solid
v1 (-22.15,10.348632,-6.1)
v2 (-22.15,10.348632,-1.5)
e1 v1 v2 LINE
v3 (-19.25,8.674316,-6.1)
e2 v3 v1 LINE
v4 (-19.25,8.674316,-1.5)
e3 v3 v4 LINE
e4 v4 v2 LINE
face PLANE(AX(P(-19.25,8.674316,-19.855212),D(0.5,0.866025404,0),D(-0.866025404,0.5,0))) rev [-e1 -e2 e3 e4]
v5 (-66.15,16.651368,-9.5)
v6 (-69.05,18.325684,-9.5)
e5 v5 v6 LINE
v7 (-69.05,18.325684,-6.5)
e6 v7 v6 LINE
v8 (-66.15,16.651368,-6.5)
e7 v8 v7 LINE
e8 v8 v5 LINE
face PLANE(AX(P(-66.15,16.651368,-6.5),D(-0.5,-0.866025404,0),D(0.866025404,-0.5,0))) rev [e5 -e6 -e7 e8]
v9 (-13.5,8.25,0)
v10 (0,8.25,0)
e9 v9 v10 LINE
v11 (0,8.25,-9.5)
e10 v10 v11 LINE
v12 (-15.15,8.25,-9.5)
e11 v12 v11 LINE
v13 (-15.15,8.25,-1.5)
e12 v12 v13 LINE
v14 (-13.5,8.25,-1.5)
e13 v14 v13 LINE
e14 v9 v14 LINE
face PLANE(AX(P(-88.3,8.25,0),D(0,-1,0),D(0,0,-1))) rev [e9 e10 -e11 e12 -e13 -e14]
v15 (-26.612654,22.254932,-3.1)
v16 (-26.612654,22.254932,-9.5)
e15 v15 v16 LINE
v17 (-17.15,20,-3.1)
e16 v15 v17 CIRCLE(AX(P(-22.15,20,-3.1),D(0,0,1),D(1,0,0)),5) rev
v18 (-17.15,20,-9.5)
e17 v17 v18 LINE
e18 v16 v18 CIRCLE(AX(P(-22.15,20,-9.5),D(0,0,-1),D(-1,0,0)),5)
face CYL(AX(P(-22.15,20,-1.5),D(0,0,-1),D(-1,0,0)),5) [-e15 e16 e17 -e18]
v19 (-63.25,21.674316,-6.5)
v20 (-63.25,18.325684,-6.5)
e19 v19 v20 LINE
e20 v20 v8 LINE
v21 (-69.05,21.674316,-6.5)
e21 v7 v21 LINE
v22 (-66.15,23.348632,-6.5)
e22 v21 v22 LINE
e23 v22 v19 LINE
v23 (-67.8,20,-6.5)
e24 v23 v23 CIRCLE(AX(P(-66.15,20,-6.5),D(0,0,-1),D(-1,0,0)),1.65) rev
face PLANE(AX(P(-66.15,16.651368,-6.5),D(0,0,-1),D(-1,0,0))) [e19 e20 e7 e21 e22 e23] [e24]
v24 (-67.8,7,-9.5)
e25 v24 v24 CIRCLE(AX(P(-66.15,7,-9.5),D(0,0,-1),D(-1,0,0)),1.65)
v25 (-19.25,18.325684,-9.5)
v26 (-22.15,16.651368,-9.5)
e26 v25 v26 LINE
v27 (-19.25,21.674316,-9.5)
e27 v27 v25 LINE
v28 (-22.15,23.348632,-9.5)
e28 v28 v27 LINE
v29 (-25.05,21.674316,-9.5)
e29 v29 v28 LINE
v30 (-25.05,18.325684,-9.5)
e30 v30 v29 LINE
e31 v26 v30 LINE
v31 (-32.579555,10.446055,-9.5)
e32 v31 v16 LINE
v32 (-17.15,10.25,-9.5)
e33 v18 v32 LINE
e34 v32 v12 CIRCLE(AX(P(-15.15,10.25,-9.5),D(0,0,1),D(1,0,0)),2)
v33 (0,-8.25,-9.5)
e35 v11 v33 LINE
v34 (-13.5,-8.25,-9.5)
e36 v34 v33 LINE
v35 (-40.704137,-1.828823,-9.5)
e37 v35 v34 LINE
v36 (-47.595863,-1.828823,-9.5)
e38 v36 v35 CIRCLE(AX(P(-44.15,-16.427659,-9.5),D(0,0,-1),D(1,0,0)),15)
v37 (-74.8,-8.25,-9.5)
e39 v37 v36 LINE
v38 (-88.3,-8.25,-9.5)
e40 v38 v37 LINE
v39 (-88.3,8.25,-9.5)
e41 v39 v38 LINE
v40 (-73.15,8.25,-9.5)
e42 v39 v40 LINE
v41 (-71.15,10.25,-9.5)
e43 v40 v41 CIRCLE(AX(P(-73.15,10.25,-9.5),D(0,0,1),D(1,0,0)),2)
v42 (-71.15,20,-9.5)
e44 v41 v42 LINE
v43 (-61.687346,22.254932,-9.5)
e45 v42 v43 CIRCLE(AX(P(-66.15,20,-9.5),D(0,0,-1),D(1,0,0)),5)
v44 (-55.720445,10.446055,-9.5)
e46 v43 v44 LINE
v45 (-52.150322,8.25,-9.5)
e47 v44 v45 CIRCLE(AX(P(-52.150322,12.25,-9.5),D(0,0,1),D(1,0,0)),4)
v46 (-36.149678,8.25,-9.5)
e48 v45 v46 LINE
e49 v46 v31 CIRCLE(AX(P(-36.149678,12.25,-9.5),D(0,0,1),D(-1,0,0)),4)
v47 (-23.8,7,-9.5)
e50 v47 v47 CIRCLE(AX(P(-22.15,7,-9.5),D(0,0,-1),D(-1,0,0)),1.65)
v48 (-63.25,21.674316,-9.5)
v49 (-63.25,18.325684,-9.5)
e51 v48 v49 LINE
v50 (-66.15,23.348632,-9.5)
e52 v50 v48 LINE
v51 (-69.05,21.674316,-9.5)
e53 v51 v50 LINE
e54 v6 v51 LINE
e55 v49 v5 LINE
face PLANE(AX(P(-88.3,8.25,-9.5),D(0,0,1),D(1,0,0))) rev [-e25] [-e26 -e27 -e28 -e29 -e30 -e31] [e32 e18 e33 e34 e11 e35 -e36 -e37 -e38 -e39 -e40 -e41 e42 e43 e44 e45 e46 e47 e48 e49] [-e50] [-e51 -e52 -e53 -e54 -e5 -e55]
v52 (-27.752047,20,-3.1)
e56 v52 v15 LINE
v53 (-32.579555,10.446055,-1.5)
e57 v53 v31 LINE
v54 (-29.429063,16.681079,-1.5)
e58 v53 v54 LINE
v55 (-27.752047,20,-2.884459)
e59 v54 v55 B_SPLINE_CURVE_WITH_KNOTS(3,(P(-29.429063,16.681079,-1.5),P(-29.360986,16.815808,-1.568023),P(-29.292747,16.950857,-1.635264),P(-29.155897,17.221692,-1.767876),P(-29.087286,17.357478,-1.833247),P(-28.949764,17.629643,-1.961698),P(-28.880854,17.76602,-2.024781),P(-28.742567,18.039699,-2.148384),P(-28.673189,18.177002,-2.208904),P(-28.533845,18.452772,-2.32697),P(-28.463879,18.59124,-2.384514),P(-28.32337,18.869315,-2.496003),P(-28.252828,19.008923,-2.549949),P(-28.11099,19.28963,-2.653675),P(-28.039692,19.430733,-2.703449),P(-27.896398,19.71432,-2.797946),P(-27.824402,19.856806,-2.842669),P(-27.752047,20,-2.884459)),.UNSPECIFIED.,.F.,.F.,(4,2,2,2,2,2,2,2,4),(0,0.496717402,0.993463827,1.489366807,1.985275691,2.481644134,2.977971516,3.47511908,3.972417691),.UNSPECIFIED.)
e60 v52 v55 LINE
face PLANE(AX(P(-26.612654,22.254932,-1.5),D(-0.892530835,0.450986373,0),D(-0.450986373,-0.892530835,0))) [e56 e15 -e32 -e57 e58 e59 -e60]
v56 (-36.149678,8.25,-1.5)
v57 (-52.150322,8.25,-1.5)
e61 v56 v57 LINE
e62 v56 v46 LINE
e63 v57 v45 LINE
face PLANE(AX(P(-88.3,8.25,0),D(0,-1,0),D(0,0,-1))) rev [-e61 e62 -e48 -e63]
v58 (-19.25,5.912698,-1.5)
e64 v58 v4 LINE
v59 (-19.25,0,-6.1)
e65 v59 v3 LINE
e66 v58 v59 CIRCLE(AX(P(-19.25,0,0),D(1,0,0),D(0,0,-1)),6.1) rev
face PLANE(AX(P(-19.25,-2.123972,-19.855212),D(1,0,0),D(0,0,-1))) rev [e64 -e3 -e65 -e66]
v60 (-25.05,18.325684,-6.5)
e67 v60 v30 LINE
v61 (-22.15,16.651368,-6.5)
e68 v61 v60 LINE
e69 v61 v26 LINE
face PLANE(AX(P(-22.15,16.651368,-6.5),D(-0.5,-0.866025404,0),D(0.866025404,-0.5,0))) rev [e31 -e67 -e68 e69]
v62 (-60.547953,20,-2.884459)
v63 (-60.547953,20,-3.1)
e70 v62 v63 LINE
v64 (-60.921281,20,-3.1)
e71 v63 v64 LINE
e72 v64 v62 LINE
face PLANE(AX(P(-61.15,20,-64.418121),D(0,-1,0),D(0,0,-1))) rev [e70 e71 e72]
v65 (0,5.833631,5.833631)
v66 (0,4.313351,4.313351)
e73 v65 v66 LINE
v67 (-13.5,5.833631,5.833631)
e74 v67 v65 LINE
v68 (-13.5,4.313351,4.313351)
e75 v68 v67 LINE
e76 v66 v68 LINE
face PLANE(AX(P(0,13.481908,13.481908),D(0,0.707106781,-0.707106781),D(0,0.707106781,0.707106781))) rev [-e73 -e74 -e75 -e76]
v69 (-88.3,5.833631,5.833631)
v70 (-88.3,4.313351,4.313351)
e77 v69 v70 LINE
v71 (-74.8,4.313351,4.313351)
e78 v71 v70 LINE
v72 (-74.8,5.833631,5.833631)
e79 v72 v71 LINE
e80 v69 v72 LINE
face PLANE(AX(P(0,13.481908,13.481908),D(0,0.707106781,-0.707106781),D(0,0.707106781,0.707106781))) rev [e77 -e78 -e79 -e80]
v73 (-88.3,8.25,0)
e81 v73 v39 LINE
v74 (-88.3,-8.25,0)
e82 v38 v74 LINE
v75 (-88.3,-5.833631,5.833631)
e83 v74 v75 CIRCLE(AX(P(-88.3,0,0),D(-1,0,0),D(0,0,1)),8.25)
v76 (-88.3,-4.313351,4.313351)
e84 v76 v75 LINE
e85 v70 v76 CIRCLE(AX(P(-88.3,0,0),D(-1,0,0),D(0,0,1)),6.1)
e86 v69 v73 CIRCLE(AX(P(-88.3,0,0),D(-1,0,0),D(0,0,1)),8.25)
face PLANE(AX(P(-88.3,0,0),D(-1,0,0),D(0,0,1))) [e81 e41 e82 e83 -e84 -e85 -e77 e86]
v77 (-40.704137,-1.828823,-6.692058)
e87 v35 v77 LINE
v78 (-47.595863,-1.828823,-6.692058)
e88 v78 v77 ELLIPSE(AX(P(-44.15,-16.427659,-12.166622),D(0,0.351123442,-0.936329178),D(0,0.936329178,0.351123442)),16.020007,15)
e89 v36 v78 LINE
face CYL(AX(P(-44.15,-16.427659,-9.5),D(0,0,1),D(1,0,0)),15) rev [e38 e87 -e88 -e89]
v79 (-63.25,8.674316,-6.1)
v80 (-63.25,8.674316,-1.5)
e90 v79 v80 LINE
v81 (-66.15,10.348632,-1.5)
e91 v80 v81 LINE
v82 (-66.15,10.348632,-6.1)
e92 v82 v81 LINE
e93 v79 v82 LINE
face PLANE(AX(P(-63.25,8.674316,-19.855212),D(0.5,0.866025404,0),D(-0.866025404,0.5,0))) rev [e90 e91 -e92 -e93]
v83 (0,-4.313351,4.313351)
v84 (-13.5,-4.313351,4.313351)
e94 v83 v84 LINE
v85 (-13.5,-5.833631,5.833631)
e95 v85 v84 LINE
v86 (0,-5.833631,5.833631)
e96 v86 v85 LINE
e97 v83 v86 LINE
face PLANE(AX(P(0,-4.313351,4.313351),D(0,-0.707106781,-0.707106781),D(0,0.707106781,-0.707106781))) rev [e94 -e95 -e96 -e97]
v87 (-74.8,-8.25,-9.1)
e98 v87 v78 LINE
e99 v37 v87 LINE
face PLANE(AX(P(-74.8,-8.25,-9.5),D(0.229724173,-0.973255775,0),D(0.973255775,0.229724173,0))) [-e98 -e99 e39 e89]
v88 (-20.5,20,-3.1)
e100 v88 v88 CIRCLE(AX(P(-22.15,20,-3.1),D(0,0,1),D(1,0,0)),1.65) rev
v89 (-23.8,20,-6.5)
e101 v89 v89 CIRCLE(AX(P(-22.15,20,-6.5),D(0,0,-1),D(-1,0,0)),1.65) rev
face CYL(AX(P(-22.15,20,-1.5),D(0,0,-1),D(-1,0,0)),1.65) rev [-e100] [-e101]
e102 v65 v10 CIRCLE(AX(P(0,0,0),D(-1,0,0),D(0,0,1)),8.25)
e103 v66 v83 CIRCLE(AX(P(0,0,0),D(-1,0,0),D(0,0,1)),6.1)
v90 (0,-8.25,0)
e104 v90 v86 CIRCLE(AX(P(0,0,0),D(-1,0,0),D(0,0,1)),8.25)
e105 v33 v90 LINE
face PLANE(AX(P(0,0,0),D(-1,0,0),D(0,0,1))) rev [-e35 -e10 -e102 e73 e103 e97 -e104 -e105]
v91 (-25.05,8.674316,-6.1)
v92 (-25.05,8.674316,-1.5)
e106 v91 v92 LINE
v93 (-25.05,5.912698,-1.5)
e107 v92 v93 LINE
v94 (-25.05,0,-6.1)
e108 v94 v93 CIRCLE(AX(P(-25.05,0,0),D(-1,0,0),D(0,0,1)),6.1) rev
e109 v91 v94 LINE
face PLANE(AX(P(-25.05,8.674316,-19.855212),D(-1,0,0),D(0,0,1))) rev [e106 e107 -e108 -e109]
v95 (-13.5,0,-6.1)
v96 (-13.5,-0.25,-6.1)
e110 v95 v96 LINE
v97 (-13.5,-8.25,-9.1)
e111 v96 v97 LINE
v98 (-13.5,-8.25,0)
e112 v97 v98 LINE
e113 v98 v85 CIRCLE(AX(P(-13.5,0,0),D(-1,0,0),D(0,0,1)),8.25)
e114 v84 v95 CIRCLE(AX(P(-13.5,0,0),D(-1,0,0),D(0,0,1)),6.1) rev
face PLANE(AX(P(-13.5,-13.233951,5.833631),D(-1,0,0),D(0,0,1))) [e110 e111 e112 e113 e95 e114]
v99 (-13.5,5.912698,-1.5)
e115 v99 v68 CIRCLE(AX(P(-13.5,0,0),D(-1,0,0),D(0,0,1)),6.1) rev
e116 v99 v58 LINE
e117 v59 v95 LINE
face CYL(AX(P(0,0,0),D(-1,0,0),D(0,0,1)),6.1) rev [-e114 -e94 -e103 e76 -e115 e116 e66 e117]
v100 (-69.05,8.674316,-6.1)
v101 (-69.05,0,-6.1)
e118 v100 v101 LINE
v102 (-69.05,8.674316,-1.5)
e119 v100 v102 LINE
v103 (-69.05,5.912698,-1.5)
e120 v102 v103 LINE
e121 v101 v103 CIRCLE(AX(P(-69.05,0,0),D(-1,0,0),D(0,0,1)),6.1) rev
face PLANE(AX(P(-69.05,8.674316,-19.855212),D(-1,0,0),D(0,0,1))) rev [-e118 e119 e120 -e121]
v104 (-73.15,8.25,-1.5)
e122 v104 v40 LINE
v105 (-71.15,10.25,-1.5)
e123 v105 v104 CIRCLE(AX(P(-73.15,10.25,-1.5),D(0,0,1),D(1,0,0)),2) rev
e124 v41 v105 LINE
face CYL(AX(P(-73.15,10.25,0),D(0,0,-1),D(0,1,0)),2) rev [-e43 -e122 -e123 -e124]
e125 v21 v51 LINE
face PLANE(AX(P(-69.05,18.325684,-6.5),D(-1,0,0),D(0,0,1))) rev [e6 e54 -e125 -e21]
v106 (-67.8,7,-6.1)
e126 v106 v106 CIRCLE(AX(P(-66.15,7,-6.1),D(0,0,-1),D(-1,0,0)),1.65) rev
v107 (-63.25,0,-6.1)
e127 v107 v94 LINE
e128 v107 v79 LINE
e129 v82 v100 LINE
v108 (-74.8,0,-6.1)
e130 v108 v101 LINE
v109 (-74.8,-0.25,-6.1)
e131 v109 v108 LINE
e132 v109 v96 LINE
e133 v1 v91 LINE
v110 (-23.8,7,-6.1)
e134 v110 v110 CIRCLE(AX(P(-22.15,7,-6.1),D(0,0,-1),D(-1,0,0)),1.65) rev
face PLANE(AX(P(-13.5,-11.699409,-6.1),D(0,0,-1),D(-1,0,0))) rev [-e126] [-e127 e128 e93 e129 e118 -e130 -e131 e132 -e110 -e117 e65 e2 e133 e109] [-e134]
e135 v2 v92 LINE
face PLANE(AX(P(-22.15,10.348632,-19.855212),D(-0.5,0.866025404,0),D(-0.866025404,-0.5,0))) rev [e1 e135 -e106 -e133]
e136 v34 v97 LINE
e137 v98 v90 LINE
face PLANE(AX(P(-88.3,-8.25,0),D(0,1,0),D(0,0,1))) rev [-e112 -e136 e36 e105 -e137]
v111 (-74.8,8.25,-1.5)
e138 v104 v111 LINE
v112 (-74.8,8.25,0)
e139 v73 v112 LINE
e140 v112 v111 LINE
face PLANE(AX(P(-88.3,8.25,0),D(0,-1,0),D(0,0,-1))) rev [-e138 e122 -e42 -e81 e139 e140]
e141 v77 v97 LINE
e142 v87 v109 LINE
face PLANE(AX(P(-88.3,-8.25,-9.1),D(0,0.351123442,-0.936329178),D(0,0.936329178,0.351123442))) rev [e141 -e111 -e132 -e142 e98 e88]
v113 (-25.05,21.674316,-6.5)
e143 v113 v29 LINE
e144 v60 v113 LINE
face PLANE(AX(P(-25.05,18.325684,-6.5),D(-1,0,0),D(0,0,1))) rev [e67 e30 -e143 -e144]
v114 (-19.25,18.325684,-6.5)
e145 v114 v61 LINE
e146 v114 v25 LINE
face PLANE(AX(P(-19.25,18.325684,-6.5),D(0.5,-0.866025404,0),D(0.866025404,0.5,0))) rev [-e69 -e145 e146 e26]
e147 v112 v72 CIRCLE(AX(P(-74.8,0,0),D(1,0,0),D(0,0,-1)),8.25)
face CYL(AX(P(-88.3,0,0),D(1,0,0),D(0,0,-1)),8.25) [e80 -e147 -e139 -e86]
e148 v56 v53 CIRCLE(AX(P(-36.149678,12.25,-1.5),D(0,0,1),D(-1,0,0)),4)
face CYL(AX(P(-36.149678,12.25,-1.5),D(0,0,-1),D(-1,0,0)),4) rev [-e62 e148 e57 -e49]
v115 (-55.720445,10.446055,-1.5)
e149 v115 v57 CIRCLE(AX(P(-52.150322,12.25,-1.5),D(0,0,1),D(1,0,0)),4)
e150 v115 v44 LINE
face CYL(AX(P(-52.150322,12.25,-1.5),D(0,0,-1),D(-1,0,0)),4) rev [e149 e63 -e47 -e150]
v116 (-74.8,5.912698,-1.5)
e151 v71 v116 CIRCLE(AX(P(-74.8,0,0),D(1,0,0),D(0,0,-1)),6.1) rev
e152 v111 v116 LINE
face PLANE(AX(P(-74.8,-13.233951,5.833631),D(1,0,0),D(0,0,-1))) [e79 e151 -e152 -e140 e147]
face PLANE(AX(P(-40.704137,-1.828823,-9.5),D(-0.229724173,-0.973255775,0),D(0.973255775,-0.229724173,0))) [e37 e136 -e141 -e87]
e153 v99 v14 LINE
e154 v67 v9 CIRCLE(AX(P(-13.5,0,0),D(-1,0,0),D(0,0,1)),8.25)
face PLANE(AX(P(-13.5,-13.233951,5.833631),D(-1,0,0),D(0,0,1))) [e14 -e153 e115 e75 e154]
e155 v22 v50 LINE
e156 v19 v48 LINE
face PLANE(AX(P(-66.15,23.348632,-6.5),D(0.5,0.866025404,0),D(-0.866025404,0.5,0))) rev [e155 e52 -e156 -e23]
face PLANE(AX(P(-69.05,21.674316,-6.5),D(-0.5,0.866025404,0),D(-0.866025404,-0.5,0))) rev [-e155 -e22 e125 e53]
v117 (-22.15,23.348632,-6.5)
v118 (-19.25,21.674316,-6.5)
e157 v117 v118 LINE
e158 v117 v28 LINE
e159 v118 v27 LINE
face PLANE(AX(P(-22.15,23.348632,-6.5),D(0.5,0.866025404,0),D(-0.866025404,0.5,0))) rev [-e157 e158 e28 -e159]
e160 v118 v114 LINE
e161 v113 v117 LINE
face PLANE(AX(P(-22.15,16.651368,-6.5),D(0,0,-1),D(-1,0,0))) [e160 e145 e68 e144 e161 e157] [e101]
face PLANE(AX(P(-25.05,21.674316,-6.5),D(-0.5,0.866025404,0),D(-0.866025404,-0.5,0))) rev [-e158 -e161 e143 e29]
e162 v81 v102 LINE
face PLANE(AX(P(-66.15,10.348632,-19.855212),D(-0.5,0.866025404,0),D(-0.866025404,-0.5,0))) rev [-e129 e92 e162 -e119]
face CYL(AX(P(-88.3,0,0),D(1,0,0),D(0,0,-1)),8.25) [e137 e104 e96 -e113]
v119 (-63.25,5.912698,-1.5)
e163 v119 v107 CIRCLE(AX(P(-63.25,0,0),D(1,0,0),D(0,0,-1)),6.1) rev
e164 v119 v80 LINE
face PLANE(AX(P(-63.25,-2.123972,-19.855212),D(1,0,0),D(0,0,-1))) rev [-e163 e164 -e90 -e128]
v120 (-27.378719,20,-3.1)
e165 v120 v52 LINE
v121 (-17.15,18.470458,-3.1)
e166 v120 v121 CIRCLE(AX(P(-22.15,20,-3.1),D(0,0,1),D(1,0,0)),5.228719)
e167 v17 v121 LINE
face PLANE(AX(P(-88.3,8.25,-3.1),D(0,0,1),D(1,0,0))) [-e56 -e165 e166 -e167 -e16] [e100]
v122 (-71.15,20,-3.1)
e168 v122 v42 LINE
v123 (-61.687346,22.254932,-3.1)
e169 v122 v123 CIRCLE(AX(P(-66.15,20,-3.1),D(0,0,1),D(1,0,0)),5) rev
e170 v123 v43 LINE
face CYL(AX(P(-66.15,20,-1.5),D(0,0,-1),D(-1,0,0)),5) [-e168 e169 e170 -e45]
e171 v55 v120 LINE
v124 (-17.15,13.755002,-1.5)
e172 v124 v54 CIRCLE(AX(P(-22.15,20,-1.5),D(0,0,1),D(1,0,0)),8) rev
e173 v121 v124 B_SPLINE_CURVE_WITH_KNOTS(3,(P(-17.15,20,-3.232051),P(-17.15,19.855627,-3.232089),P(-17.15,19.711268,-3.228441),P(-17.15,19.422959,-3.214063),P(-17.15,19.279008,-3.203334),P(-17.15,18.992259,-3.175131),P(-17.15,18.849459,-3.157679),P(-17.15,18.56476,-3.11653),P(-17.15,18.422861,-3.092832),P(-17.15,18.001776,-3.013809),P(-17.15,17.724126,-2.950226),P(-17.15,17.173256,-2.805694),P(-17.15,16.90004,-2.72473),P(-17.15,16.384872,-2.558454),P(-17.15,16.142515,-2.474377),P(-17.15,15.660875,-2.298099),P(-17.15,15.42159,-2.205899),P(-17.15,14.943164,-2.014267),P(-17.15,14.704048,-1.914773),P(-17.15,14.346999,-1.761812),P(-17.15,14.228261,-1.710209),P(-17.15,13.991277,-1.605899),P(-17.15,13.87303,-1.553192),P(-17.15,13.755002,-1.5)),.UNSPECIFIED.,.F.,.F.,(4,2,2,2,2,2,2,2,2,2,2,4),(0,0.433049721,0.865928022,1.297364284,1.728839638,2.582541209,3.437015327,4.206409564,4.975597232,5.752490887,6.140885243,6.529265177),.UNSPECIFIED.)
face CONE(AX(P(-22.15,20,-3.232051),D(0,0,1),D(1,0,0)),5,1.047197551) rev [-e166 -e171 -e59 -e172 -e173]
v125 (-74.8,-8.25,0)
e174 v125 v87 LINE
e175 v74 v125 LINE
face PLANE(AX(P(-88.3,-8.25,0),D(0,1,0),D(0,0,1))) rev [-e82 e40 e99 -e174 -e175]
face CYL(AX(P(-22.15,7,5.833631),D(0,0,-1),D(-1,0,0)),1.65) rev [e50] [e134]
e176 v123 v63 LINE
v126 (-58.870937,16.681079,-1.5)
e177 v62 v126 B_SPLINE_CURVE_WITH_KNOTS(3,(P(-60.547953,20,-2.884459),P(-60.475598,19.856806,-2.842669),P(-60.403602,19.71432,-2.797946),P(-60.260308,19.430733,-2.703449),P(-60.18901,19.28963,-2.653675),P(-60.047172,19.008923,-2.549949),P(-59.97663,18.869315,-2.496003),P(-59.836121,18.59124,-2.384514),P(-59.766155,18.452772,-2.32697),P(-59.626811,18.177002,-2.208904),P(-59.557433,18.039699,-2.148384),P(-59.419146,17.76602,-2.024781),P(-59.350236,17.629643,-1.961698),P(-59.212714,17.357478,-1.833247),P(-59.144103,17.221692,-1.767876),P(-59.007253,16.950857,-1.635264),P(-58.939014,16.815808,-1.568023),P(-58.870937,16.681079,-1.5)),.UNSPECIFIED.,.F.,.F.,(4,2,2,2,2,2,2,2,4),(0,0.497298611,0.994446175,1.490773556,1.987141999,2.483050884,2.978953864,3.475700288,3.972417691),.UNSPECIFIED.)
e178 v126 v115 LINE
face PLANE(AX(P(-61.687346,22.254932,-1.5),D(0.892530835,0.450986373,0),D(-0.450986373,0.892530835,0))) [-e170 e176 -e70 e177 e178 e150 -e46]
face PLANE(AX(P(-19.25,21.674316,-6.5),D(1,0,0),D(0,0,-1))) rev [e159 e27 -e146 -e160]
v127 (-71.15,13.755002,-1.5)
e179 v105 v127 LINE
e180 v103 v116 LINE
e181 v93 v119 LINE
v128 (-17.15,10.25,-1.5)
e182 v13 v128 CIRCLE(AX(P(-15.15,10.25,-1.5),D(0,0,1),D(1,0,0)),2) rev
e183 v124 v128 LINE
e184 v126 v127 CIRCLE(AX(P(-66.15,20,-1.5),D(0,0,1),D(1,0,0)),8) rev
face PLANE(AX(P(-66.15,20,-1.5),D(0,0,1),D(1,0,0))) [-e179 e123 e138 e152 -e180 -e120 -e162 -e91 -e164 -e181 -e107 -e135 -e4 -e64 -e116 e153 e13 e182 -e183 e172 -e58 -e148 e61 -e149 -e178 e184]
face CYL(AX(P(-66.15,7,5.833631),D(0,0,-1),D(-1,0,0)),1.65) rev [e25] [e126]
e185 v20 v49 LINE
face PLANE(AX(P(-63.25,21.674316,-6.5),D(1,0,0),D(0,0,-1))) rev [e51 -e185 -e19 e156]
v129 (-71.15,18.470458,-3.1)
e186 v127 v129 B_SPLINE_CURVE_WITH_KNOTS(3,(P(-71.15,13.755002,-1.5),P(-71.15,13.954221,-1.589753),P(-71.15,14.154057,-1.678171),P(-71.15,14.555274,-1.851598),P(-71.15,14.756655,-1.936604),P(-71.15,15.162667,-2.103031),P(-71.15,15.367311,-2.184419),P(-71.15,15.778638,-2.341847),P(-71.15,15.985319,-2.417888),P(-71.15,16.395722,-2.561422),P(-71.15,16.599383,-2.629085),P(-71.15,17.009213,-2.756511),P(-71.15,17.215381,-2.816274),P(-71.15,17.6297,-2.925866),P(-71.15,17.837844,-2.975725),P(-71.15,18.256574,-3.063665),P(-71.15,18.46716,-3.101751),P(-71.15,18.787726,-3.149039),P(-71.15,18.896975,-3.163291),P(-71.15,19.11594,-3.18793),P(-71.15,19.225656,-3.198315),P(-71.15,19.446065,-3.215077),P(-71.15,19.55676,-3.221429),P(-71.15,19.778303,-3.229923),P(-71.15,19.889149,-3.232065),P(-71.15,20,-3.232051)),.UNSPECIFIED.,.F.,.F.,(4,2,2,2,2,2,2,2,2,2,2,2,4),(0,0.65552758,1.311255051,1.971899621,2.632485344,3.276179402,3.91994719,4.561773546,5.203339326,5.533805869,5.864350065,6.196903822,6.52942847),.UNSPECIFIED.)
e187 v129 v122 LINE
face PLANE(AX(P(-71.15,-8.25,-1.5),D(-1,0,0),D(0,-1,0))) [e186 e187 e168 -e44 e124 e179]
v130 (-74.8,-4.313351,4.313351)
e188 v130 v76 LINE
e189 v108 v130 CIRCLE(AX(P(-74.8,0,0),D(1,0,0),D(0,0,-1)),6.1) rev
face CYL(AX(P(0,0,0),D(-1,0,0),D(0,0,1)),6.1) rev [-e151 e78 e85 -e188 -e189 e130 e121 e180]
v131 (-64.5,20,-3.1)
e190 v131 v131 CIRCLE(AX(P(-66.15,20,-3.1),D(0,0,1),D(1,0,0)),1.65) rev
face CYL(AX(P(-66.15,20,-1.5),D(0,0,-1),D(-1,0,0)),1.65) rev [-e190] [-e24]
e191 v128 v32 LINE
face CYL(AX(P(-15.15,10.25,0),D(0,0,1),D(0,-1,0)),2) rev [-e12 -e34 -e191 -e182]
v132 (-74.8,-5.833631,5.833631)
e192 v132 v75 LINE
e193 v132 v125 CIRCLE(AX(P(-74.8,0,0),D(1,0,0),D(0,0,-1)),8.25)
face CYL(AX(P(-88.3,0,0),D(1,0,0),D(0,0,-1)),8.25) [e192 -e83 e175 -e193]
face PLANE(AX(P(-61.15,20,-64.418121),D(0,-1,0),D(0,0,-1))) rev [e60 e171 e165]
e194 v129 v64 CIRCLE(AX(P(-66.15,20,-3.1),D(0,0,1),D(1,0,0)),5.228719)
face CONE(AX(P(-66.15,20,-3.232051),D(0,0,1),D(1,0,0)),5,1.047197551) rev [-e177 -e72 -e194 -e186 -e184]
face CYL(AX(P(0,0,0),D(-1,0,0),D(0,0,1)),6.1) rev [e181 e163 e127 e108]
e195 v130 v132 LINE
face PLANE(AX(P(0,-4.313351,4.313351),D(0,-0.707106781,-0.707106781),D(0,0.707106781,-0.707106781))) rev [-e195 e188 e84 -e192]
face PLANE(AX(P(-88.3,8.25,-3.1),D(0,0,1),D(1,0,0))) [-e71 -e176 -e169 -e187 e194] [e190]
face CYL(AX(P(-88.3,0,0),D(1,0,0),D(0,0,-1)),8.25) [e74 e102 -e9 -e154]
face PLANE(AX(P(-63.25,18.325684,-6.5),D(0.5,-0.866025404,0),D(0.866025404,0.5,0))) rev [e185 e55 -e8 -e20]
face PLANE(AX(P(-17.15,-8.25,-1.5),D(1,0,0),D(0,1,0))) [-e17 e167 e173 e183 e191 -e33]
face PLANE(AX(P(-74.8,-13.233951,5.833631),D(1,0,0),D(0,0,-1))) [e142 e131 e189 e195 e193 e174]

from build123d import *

# Parameters (mm, degrees)
BOSS_EXTRUDE1_DEPTH = 88.3
SKETCH6_R           = 1.65
BOSS_EXTRUDE2_DEPTH = 8
CUT_EXTRUDE1_DEPTH  = 93.261259475
SKETCH8_W           = 61.3
SKETCH8_H           = 21.483950942
CUT_EXTRUDE2_DEPTH  = 93.118890571
SKETCH9_W           = 61.3
SKETCH9_H           = 11.699409457
CUT_EXTRUDE3_DEPTH  = 93.543511645
SKETCH10_R          = 1.65
CUT_EXTRUDE4_DEPTH  = 94.043055829
CHAMFER1_SIZE       = 8
CHAMFER1_SIZE2      = 3
CUT_EXTRUDE5_DEPTH  = 93.54351174
FILLET1_R           = 2
CUT_EXTRUDE6_DEPTH  = 3
CUT_EXTRUDE7_START  = -4.6
CUT_EXTRUDE7_DEPTH  = 4.6
CUT_EXTRUDE8_START  = -1.6
CUT_EXTRUDE8_DEPTH  = 1.6
CHAMFER2_SIZE       = 1.732050808
CHAMFER2_SIZE_2     = 3


with BuildPart() as part:
    # Sketch1 → Boss-Extrude1 (new body)
    with BuildSketch(Plane.ZY):
        with BuildLine():
            Line((-9.5, 8.25), (-9.5, -8.25))
            Line((-9.5, -8.25), (0, -8.25))
            ThreePointArc((0, -8.25), (8.25, 0), (0, 8.25))
            Line((0, 8.25), (-9.5, 8.25))
        make_face()
    extrude(amount=BOSS_EXTRUDE1_DEPTH)

    # Sketch6 → Boss-Extrude2 (add)
    with BuildSketch(Plane(origin=(0, 0, -9.5), x_dir=(-1, 0, 0), z_dir=(0, 0, -1))):
        with BuildLine():
            Line((17.15, -8.25), (17.15, 20))
            ThreePointArc((17.15, 20), (20.99096395, 24.863808737), (26.612654174, 22.254931867))
            Line((26.612654174, 22.254931867), (32.579554775, 10.446054507))
            ThreePointArc((32.579554775, 10.446054507), (34.053942202, 8.842964487), (36.149678114, 8.25))
            Line((36.149678114, 8.25), (52.150321886, 8.25))
            ThreePointArc((52.150321886, 8.25), (54.246057798, 8.842964487), (55.720445225, 10.446054507))
            Line((55.720445225, 10.446054507), (61.687345826, 22.254931867))
            ThreePointArc((61.687345826, 22.254931867), (67.30903605, 24.863808737), (71.15, 20))
            Line((71.15, 20), (71.15, -8.25))
            Line((71.15, -8.25), (17.15, -8.25))
        make_face()
        with Locations((22.15, 20)):
            Circle(SKETCH6_R, mode=Mode.SUBTRACT)
        with Locations(Location((66.15, 20, 0), (0, 0, 180))):
            Circle(SKETCH6_R, mode=Mode.SUBTRACT)
    extrude(amount=-BOSS_EXTRUDE2_DEPTH)

    # Sketch7 → Cut-Extrude1 (cut, through all)
    with BuildSketch(Plane.ZY.offset(88.3)):
        with BuildLine():
            Line((13.481907846, 13.481907846), (4.313351365, 4.313351365))
            ThreePointArc((4.313351365, 4.313351365), (-6.1, 0), (4.313351365, -4.313351365))
            Line((4.313351365, -4.313351365), (13.481907846, -13.481907846))
            Line((13.481907846, -13.481907846), (13.481907846, 13.481907846))
        make_face()
    extrude(amount=-CUT_EXTRUDE1_DEPTH, mode=Mode.SUBTRACT)

    # Sketch8 → Cut-Extrude2 (cut, through all)
    with BuildSketch(Plane.XY.offset(-1.5)):
        with Locations((-44.15, -2.491975471)):
            Rectangle(SKETCH8_W, SKETCH8_H)
    extrude(amount=CUT_EXTRUDE2_DEPTH, mode=Mode.SUBTRACT)

    # Sketch9 → Cut-Extrude3 (cut, through all)
    with BuildSketch(Plane(origin=(0, 0, -6.1), x_dir=(-1, 0, 0), z_dir=(0, 0, -1))):
        with Locations((44.15, -5.849704729)):
            Rectangle(SKETCH9_W, SKETCH9_H)
    extrude(amount=-CUT_EXTRUDE3_DEPTH, mode=Mode.SUBTRACT)

    # Sketch10 → Cut-Extrude4 (cut, through all)
    with BuildSketch(Plane(origin=(0, 0, -9.5), x_dir=(-1, 0, 0), z_dir=(0, 0, -1))):
        with Locations((22.15, 7)):
            Circle(SKETCH10_R)
        with Locations((66.15, 7)):
            Circle(SKETCH10_R)
    extrude(amount=-CUT_EXTRUDE4_DEPTH, mode=Mode.SUBTRACT)

    # Chamfer1
    chamfer1_edges = [part.edges().sort_by_distance(p)[0] for p in [
        (-44.15, -8.25, -6.1),
    ]]
    chamfer1_side = [part.faces().sort_by_distance(p)[0] for p in [
        (-44.15, -4.125, -6.1),
    ]]
    chamfer(chamfer1_edges, length=CHAMFER1_SIZE, length2=CHAMFER1_SIZE2, reference=chamfer1_side[0])

    # Sketch11 → Cut-Extrude5 (cut, through all)
    with BuildSketch(Plane(origin=(0, 0, -6.1), x_dir=(-1, 0, 0), z_dir=(0, 0, -1))):
        with BuildLine():
            Line((74.8, -8.25), (47.5958626, -1.828822614))
            ThreePointArc((47.5958626, -1.828822614), (44.15, -1.427659244), (40.7041374, -1.828822614))
            Line((40.7041374, -1.828822614), (13.5, -8.25))
            Line((13.5, -8.25), (13.5, -16.427659244))
            Line((13.5, -16.427659244), (74.8, -16.427659244))
            Line((74.8, -16.427659244), (74.8, -8.25))
        make_face()
    extrude(amount=CUT_EXTRUDE5_DEPTH, mode=Mode.SUBTRACT)

    # Fillet1
    fillet1_edges = [part.edges().sort_by_distance(p)[0] for p in [
        (-17.15, 8.25, -5.5),
        (-71.15, 8.25, -5.5),
    ]]
    fillet(fillet1_edges, radius=FILLET1_R)

    # Sketch12 → Cut-Extrude6 (cut)
    with BuildSketch(Plane(origin=(0, 0, -9.5), x_dir=(-1, 0, 0), z_dir=(0, 0, -1))):
        Polygon((22.15, 16.651368439), (25.05, 18.325684219), (25.05, 21.674315781), (22.15, 23.348631561), (19.25, 21.674315781), (19.25, 18.325684219), align=None)
        Polygon((66.15, 16.651368439), (69.05, 18.325684219), (69.05, 21.674315781), (66.15, 23.348631561), (63.25, 21.674315781), (63.25, 18.325684219), align=None)
    extrude(amount=-CUT_EXTRUDE6_DEPTH, mode=Mode.SUBTRACT)

    # Sketch13 → Cut-Extrude7 (cut)
    with BuildSketch(Plane.XY.offset(-1.5).offset(CUT_EXTRUDE7_START)):
        Polygon((-69.05, -2.12397244), (-63.25, -2.12397244), (-63.25, 8.674315781), (-66.15, 10.348631561), (-69.05, 8.674315781), align=None)
        Polygon((-25.05, -2.12397244), (-19.25, -2.12397244), (-19.25, 8.674315781), (-22.15, 10.348631561), (-25.05, 8.674315781), align=None)
    extrude(amount=CUT_EXTRUDE7_DEPTH, mode=Mode.SUBTRACT)

    # Sketch14 → Cut-Extrude8 (cut)
    with BuildSketch(Plane.XY.offset(-1.5).offset(CUT_EXTRUDE8_START)):
        with BuildLine():
            Line((-61.15, 20), (-27.15, 20))
            ThreePointArc((-27.15, 20), (-18.614466094, 16.464466094), (-22.15, 25))
            Line((-22.15, 25), (-66.15, 25))
            ThreePointArc((-66.15, 25), (-69.685533906, 16.464466094), (-61.15, 20))
        make_face()
    extrude(amount=CUT_EXTRUDE8_DEPTH, mode=Mode.SUBTRACT)

    # Chamfer2
    # the kernel refuses this chamfer: 3, 1.732050808 mm, written as the material it takes off along each edge
    with BuildSketch(Plane(origin=(-22.15, 20, -1.5), x_dir=(-0.016047871272964892, 0.9998712246222542, 0), z_dir=(0.9998712246222542, 0.016047871272964892, 0))) as chamfer2_piece_1_section:
        Polygon((5, -CHAMFER2_SIZE), (5 + CHAMFER2_SIZE_2, 0), (5, 0), align=None)
    chamfer2_piece_1 = revolve(axis=Axis((-22.15, 20, -1.5), (0, 0, 1)), revolution_arc=358.160970471, mode=Mode.PRIVATE)
    chamfer2_piece_1 = split(chamfer2_piece_1, bisect_by=Plane(origin=(-17.15, 16.005759066, -2.231169886), z_dir=(-1, 0, 0)), keep=Keep.TOP, mode=Mode.PRIVATE)
    chamfer2_piece_1 = split(chamfer2_piece_1, bisect_by=Plane(origin=(-27.459187994, 16.005759066, -3.1), z_dir=(0, 0, 1)), keep=Keep.TOP, mode=Mode.PRIVATE)
    add(chamfer2_piece_1, mode=Mode.SUBTRACT)
    with BuildSketch(Plane(origin=(-22.15, 20, -1.5), x_dir=(-0.016047871272964892, 0.9998712246222542, 0), z_dir=(0.9998712246222542, 0.016047871272964892, 0))) as chamfer2_piece_2_section:
        Polygon((5, -CHAMFER2_SIZE), (5 + CHAMFER2_SIZE_2, 0), (5, 0), align=None)
    chamfer2_piece_2 = revolve(axis=Axis((-22.15, 20, -1.5), (0, 0, 1)), revolution_arc=358.160970471, mode=Mode.PRIVATE)
    chamfer2_piece_2 = split(chamfer2_piece_2, bisect_by=Plane(origin=(-17.15, 20, -1.92443376), z_dir=(1, 0, 0)), keep=Keep.TOP, mode=Mode.PRIVATE)
    chamfer2_piece_2 = split(chamfer2_piece_2, bisect_by=Plane(origin=(-16.215864926, 20, -3.1), z_dir=(0, 0, 1)), keep=Keep.TOP, mode=Mode.PRIVATE)
    add(chamfer2_piece_2, mode=Mode.SUBTRACT)
    with BuildSketch(Plane(origin=(-66.15, 20, -1.5), x_dir=(-0.016047871272962772, 0.9998712246222542, 0), z_dir=(0.9998712246222542, 0.016047871272962772, 0))) as chamfer2_piece_3_section:
        Polygon((5, -CHAMFER2_SIZE), (5 + CHAMFER2_SIZE_2, 0), (5, 0), align=None)
    chamfer2_piece_3 = revolve(axis=Axis((-66.15, 20, -1.5), (0, 0, 1)), revolution_arc=358.160970471, mode=Mode.PRIVATE)
    chamfer2_piece_3 = split(chamfer2_piece_3, bisect_by=Plane(origin=(-70.144240933, 25.309187993, -3.1), z_dir=(0, 0, 1)), keep=Keep.TOP, mode=Mode.PRIVATE)
    chamfer2_piece_3 = split(chamfer2_piece_3, bisect_by=Plane(origin=(-71.15, 25.309187993, -2.231169885), z_dir=(1, 0, 0)), keep=Keep.TOP, mode=Mode.PRIVATE)
    add(chamfer2_piece_3, mode=Mode.SUBTRACT)
    with BuildSketch(Plane(origin=(-66.15, 20, -1.5), x_dir=(-0.016047871272962772, 0.9998712246222542, 0), z_dir=(0.9998712246222542, 0.016047871272962772, 0))) as chamfer2_piece_4_section:
        Polygon((5, -CHAMFER2_SIZE), (5 + CHAMFER2_SIZE_2, 0), (5, 0), align=None)
    chamfer2_piece_4 = revolve(axis=Axis((-66.15, 20, -1.5), (0, 0, 1)), revolution_arc=358.160970471, mode=Mode.PRIVATE)
    chamfer2_piece_4 = split(chamfer2_piece_4, bisect_by=Plane(origin=(-72.084135074, 20, -3.1), z_dir=(0, 0, 1)), keep=Keep.TOP, mode=Mode.PRIVATE)
    chamfer2_piece_4 = split(chamfer2_piece_4, bisect_by=Plane(origin=(-71.15, 20, -1.92443376), z_dir=(-1, 0, 0)), keep=Keep.TOP, mode=Mode.PRIVATE)
    add(chamfer2_piece_4, mode=Mode.SUBTRACT)


solid = part.part
